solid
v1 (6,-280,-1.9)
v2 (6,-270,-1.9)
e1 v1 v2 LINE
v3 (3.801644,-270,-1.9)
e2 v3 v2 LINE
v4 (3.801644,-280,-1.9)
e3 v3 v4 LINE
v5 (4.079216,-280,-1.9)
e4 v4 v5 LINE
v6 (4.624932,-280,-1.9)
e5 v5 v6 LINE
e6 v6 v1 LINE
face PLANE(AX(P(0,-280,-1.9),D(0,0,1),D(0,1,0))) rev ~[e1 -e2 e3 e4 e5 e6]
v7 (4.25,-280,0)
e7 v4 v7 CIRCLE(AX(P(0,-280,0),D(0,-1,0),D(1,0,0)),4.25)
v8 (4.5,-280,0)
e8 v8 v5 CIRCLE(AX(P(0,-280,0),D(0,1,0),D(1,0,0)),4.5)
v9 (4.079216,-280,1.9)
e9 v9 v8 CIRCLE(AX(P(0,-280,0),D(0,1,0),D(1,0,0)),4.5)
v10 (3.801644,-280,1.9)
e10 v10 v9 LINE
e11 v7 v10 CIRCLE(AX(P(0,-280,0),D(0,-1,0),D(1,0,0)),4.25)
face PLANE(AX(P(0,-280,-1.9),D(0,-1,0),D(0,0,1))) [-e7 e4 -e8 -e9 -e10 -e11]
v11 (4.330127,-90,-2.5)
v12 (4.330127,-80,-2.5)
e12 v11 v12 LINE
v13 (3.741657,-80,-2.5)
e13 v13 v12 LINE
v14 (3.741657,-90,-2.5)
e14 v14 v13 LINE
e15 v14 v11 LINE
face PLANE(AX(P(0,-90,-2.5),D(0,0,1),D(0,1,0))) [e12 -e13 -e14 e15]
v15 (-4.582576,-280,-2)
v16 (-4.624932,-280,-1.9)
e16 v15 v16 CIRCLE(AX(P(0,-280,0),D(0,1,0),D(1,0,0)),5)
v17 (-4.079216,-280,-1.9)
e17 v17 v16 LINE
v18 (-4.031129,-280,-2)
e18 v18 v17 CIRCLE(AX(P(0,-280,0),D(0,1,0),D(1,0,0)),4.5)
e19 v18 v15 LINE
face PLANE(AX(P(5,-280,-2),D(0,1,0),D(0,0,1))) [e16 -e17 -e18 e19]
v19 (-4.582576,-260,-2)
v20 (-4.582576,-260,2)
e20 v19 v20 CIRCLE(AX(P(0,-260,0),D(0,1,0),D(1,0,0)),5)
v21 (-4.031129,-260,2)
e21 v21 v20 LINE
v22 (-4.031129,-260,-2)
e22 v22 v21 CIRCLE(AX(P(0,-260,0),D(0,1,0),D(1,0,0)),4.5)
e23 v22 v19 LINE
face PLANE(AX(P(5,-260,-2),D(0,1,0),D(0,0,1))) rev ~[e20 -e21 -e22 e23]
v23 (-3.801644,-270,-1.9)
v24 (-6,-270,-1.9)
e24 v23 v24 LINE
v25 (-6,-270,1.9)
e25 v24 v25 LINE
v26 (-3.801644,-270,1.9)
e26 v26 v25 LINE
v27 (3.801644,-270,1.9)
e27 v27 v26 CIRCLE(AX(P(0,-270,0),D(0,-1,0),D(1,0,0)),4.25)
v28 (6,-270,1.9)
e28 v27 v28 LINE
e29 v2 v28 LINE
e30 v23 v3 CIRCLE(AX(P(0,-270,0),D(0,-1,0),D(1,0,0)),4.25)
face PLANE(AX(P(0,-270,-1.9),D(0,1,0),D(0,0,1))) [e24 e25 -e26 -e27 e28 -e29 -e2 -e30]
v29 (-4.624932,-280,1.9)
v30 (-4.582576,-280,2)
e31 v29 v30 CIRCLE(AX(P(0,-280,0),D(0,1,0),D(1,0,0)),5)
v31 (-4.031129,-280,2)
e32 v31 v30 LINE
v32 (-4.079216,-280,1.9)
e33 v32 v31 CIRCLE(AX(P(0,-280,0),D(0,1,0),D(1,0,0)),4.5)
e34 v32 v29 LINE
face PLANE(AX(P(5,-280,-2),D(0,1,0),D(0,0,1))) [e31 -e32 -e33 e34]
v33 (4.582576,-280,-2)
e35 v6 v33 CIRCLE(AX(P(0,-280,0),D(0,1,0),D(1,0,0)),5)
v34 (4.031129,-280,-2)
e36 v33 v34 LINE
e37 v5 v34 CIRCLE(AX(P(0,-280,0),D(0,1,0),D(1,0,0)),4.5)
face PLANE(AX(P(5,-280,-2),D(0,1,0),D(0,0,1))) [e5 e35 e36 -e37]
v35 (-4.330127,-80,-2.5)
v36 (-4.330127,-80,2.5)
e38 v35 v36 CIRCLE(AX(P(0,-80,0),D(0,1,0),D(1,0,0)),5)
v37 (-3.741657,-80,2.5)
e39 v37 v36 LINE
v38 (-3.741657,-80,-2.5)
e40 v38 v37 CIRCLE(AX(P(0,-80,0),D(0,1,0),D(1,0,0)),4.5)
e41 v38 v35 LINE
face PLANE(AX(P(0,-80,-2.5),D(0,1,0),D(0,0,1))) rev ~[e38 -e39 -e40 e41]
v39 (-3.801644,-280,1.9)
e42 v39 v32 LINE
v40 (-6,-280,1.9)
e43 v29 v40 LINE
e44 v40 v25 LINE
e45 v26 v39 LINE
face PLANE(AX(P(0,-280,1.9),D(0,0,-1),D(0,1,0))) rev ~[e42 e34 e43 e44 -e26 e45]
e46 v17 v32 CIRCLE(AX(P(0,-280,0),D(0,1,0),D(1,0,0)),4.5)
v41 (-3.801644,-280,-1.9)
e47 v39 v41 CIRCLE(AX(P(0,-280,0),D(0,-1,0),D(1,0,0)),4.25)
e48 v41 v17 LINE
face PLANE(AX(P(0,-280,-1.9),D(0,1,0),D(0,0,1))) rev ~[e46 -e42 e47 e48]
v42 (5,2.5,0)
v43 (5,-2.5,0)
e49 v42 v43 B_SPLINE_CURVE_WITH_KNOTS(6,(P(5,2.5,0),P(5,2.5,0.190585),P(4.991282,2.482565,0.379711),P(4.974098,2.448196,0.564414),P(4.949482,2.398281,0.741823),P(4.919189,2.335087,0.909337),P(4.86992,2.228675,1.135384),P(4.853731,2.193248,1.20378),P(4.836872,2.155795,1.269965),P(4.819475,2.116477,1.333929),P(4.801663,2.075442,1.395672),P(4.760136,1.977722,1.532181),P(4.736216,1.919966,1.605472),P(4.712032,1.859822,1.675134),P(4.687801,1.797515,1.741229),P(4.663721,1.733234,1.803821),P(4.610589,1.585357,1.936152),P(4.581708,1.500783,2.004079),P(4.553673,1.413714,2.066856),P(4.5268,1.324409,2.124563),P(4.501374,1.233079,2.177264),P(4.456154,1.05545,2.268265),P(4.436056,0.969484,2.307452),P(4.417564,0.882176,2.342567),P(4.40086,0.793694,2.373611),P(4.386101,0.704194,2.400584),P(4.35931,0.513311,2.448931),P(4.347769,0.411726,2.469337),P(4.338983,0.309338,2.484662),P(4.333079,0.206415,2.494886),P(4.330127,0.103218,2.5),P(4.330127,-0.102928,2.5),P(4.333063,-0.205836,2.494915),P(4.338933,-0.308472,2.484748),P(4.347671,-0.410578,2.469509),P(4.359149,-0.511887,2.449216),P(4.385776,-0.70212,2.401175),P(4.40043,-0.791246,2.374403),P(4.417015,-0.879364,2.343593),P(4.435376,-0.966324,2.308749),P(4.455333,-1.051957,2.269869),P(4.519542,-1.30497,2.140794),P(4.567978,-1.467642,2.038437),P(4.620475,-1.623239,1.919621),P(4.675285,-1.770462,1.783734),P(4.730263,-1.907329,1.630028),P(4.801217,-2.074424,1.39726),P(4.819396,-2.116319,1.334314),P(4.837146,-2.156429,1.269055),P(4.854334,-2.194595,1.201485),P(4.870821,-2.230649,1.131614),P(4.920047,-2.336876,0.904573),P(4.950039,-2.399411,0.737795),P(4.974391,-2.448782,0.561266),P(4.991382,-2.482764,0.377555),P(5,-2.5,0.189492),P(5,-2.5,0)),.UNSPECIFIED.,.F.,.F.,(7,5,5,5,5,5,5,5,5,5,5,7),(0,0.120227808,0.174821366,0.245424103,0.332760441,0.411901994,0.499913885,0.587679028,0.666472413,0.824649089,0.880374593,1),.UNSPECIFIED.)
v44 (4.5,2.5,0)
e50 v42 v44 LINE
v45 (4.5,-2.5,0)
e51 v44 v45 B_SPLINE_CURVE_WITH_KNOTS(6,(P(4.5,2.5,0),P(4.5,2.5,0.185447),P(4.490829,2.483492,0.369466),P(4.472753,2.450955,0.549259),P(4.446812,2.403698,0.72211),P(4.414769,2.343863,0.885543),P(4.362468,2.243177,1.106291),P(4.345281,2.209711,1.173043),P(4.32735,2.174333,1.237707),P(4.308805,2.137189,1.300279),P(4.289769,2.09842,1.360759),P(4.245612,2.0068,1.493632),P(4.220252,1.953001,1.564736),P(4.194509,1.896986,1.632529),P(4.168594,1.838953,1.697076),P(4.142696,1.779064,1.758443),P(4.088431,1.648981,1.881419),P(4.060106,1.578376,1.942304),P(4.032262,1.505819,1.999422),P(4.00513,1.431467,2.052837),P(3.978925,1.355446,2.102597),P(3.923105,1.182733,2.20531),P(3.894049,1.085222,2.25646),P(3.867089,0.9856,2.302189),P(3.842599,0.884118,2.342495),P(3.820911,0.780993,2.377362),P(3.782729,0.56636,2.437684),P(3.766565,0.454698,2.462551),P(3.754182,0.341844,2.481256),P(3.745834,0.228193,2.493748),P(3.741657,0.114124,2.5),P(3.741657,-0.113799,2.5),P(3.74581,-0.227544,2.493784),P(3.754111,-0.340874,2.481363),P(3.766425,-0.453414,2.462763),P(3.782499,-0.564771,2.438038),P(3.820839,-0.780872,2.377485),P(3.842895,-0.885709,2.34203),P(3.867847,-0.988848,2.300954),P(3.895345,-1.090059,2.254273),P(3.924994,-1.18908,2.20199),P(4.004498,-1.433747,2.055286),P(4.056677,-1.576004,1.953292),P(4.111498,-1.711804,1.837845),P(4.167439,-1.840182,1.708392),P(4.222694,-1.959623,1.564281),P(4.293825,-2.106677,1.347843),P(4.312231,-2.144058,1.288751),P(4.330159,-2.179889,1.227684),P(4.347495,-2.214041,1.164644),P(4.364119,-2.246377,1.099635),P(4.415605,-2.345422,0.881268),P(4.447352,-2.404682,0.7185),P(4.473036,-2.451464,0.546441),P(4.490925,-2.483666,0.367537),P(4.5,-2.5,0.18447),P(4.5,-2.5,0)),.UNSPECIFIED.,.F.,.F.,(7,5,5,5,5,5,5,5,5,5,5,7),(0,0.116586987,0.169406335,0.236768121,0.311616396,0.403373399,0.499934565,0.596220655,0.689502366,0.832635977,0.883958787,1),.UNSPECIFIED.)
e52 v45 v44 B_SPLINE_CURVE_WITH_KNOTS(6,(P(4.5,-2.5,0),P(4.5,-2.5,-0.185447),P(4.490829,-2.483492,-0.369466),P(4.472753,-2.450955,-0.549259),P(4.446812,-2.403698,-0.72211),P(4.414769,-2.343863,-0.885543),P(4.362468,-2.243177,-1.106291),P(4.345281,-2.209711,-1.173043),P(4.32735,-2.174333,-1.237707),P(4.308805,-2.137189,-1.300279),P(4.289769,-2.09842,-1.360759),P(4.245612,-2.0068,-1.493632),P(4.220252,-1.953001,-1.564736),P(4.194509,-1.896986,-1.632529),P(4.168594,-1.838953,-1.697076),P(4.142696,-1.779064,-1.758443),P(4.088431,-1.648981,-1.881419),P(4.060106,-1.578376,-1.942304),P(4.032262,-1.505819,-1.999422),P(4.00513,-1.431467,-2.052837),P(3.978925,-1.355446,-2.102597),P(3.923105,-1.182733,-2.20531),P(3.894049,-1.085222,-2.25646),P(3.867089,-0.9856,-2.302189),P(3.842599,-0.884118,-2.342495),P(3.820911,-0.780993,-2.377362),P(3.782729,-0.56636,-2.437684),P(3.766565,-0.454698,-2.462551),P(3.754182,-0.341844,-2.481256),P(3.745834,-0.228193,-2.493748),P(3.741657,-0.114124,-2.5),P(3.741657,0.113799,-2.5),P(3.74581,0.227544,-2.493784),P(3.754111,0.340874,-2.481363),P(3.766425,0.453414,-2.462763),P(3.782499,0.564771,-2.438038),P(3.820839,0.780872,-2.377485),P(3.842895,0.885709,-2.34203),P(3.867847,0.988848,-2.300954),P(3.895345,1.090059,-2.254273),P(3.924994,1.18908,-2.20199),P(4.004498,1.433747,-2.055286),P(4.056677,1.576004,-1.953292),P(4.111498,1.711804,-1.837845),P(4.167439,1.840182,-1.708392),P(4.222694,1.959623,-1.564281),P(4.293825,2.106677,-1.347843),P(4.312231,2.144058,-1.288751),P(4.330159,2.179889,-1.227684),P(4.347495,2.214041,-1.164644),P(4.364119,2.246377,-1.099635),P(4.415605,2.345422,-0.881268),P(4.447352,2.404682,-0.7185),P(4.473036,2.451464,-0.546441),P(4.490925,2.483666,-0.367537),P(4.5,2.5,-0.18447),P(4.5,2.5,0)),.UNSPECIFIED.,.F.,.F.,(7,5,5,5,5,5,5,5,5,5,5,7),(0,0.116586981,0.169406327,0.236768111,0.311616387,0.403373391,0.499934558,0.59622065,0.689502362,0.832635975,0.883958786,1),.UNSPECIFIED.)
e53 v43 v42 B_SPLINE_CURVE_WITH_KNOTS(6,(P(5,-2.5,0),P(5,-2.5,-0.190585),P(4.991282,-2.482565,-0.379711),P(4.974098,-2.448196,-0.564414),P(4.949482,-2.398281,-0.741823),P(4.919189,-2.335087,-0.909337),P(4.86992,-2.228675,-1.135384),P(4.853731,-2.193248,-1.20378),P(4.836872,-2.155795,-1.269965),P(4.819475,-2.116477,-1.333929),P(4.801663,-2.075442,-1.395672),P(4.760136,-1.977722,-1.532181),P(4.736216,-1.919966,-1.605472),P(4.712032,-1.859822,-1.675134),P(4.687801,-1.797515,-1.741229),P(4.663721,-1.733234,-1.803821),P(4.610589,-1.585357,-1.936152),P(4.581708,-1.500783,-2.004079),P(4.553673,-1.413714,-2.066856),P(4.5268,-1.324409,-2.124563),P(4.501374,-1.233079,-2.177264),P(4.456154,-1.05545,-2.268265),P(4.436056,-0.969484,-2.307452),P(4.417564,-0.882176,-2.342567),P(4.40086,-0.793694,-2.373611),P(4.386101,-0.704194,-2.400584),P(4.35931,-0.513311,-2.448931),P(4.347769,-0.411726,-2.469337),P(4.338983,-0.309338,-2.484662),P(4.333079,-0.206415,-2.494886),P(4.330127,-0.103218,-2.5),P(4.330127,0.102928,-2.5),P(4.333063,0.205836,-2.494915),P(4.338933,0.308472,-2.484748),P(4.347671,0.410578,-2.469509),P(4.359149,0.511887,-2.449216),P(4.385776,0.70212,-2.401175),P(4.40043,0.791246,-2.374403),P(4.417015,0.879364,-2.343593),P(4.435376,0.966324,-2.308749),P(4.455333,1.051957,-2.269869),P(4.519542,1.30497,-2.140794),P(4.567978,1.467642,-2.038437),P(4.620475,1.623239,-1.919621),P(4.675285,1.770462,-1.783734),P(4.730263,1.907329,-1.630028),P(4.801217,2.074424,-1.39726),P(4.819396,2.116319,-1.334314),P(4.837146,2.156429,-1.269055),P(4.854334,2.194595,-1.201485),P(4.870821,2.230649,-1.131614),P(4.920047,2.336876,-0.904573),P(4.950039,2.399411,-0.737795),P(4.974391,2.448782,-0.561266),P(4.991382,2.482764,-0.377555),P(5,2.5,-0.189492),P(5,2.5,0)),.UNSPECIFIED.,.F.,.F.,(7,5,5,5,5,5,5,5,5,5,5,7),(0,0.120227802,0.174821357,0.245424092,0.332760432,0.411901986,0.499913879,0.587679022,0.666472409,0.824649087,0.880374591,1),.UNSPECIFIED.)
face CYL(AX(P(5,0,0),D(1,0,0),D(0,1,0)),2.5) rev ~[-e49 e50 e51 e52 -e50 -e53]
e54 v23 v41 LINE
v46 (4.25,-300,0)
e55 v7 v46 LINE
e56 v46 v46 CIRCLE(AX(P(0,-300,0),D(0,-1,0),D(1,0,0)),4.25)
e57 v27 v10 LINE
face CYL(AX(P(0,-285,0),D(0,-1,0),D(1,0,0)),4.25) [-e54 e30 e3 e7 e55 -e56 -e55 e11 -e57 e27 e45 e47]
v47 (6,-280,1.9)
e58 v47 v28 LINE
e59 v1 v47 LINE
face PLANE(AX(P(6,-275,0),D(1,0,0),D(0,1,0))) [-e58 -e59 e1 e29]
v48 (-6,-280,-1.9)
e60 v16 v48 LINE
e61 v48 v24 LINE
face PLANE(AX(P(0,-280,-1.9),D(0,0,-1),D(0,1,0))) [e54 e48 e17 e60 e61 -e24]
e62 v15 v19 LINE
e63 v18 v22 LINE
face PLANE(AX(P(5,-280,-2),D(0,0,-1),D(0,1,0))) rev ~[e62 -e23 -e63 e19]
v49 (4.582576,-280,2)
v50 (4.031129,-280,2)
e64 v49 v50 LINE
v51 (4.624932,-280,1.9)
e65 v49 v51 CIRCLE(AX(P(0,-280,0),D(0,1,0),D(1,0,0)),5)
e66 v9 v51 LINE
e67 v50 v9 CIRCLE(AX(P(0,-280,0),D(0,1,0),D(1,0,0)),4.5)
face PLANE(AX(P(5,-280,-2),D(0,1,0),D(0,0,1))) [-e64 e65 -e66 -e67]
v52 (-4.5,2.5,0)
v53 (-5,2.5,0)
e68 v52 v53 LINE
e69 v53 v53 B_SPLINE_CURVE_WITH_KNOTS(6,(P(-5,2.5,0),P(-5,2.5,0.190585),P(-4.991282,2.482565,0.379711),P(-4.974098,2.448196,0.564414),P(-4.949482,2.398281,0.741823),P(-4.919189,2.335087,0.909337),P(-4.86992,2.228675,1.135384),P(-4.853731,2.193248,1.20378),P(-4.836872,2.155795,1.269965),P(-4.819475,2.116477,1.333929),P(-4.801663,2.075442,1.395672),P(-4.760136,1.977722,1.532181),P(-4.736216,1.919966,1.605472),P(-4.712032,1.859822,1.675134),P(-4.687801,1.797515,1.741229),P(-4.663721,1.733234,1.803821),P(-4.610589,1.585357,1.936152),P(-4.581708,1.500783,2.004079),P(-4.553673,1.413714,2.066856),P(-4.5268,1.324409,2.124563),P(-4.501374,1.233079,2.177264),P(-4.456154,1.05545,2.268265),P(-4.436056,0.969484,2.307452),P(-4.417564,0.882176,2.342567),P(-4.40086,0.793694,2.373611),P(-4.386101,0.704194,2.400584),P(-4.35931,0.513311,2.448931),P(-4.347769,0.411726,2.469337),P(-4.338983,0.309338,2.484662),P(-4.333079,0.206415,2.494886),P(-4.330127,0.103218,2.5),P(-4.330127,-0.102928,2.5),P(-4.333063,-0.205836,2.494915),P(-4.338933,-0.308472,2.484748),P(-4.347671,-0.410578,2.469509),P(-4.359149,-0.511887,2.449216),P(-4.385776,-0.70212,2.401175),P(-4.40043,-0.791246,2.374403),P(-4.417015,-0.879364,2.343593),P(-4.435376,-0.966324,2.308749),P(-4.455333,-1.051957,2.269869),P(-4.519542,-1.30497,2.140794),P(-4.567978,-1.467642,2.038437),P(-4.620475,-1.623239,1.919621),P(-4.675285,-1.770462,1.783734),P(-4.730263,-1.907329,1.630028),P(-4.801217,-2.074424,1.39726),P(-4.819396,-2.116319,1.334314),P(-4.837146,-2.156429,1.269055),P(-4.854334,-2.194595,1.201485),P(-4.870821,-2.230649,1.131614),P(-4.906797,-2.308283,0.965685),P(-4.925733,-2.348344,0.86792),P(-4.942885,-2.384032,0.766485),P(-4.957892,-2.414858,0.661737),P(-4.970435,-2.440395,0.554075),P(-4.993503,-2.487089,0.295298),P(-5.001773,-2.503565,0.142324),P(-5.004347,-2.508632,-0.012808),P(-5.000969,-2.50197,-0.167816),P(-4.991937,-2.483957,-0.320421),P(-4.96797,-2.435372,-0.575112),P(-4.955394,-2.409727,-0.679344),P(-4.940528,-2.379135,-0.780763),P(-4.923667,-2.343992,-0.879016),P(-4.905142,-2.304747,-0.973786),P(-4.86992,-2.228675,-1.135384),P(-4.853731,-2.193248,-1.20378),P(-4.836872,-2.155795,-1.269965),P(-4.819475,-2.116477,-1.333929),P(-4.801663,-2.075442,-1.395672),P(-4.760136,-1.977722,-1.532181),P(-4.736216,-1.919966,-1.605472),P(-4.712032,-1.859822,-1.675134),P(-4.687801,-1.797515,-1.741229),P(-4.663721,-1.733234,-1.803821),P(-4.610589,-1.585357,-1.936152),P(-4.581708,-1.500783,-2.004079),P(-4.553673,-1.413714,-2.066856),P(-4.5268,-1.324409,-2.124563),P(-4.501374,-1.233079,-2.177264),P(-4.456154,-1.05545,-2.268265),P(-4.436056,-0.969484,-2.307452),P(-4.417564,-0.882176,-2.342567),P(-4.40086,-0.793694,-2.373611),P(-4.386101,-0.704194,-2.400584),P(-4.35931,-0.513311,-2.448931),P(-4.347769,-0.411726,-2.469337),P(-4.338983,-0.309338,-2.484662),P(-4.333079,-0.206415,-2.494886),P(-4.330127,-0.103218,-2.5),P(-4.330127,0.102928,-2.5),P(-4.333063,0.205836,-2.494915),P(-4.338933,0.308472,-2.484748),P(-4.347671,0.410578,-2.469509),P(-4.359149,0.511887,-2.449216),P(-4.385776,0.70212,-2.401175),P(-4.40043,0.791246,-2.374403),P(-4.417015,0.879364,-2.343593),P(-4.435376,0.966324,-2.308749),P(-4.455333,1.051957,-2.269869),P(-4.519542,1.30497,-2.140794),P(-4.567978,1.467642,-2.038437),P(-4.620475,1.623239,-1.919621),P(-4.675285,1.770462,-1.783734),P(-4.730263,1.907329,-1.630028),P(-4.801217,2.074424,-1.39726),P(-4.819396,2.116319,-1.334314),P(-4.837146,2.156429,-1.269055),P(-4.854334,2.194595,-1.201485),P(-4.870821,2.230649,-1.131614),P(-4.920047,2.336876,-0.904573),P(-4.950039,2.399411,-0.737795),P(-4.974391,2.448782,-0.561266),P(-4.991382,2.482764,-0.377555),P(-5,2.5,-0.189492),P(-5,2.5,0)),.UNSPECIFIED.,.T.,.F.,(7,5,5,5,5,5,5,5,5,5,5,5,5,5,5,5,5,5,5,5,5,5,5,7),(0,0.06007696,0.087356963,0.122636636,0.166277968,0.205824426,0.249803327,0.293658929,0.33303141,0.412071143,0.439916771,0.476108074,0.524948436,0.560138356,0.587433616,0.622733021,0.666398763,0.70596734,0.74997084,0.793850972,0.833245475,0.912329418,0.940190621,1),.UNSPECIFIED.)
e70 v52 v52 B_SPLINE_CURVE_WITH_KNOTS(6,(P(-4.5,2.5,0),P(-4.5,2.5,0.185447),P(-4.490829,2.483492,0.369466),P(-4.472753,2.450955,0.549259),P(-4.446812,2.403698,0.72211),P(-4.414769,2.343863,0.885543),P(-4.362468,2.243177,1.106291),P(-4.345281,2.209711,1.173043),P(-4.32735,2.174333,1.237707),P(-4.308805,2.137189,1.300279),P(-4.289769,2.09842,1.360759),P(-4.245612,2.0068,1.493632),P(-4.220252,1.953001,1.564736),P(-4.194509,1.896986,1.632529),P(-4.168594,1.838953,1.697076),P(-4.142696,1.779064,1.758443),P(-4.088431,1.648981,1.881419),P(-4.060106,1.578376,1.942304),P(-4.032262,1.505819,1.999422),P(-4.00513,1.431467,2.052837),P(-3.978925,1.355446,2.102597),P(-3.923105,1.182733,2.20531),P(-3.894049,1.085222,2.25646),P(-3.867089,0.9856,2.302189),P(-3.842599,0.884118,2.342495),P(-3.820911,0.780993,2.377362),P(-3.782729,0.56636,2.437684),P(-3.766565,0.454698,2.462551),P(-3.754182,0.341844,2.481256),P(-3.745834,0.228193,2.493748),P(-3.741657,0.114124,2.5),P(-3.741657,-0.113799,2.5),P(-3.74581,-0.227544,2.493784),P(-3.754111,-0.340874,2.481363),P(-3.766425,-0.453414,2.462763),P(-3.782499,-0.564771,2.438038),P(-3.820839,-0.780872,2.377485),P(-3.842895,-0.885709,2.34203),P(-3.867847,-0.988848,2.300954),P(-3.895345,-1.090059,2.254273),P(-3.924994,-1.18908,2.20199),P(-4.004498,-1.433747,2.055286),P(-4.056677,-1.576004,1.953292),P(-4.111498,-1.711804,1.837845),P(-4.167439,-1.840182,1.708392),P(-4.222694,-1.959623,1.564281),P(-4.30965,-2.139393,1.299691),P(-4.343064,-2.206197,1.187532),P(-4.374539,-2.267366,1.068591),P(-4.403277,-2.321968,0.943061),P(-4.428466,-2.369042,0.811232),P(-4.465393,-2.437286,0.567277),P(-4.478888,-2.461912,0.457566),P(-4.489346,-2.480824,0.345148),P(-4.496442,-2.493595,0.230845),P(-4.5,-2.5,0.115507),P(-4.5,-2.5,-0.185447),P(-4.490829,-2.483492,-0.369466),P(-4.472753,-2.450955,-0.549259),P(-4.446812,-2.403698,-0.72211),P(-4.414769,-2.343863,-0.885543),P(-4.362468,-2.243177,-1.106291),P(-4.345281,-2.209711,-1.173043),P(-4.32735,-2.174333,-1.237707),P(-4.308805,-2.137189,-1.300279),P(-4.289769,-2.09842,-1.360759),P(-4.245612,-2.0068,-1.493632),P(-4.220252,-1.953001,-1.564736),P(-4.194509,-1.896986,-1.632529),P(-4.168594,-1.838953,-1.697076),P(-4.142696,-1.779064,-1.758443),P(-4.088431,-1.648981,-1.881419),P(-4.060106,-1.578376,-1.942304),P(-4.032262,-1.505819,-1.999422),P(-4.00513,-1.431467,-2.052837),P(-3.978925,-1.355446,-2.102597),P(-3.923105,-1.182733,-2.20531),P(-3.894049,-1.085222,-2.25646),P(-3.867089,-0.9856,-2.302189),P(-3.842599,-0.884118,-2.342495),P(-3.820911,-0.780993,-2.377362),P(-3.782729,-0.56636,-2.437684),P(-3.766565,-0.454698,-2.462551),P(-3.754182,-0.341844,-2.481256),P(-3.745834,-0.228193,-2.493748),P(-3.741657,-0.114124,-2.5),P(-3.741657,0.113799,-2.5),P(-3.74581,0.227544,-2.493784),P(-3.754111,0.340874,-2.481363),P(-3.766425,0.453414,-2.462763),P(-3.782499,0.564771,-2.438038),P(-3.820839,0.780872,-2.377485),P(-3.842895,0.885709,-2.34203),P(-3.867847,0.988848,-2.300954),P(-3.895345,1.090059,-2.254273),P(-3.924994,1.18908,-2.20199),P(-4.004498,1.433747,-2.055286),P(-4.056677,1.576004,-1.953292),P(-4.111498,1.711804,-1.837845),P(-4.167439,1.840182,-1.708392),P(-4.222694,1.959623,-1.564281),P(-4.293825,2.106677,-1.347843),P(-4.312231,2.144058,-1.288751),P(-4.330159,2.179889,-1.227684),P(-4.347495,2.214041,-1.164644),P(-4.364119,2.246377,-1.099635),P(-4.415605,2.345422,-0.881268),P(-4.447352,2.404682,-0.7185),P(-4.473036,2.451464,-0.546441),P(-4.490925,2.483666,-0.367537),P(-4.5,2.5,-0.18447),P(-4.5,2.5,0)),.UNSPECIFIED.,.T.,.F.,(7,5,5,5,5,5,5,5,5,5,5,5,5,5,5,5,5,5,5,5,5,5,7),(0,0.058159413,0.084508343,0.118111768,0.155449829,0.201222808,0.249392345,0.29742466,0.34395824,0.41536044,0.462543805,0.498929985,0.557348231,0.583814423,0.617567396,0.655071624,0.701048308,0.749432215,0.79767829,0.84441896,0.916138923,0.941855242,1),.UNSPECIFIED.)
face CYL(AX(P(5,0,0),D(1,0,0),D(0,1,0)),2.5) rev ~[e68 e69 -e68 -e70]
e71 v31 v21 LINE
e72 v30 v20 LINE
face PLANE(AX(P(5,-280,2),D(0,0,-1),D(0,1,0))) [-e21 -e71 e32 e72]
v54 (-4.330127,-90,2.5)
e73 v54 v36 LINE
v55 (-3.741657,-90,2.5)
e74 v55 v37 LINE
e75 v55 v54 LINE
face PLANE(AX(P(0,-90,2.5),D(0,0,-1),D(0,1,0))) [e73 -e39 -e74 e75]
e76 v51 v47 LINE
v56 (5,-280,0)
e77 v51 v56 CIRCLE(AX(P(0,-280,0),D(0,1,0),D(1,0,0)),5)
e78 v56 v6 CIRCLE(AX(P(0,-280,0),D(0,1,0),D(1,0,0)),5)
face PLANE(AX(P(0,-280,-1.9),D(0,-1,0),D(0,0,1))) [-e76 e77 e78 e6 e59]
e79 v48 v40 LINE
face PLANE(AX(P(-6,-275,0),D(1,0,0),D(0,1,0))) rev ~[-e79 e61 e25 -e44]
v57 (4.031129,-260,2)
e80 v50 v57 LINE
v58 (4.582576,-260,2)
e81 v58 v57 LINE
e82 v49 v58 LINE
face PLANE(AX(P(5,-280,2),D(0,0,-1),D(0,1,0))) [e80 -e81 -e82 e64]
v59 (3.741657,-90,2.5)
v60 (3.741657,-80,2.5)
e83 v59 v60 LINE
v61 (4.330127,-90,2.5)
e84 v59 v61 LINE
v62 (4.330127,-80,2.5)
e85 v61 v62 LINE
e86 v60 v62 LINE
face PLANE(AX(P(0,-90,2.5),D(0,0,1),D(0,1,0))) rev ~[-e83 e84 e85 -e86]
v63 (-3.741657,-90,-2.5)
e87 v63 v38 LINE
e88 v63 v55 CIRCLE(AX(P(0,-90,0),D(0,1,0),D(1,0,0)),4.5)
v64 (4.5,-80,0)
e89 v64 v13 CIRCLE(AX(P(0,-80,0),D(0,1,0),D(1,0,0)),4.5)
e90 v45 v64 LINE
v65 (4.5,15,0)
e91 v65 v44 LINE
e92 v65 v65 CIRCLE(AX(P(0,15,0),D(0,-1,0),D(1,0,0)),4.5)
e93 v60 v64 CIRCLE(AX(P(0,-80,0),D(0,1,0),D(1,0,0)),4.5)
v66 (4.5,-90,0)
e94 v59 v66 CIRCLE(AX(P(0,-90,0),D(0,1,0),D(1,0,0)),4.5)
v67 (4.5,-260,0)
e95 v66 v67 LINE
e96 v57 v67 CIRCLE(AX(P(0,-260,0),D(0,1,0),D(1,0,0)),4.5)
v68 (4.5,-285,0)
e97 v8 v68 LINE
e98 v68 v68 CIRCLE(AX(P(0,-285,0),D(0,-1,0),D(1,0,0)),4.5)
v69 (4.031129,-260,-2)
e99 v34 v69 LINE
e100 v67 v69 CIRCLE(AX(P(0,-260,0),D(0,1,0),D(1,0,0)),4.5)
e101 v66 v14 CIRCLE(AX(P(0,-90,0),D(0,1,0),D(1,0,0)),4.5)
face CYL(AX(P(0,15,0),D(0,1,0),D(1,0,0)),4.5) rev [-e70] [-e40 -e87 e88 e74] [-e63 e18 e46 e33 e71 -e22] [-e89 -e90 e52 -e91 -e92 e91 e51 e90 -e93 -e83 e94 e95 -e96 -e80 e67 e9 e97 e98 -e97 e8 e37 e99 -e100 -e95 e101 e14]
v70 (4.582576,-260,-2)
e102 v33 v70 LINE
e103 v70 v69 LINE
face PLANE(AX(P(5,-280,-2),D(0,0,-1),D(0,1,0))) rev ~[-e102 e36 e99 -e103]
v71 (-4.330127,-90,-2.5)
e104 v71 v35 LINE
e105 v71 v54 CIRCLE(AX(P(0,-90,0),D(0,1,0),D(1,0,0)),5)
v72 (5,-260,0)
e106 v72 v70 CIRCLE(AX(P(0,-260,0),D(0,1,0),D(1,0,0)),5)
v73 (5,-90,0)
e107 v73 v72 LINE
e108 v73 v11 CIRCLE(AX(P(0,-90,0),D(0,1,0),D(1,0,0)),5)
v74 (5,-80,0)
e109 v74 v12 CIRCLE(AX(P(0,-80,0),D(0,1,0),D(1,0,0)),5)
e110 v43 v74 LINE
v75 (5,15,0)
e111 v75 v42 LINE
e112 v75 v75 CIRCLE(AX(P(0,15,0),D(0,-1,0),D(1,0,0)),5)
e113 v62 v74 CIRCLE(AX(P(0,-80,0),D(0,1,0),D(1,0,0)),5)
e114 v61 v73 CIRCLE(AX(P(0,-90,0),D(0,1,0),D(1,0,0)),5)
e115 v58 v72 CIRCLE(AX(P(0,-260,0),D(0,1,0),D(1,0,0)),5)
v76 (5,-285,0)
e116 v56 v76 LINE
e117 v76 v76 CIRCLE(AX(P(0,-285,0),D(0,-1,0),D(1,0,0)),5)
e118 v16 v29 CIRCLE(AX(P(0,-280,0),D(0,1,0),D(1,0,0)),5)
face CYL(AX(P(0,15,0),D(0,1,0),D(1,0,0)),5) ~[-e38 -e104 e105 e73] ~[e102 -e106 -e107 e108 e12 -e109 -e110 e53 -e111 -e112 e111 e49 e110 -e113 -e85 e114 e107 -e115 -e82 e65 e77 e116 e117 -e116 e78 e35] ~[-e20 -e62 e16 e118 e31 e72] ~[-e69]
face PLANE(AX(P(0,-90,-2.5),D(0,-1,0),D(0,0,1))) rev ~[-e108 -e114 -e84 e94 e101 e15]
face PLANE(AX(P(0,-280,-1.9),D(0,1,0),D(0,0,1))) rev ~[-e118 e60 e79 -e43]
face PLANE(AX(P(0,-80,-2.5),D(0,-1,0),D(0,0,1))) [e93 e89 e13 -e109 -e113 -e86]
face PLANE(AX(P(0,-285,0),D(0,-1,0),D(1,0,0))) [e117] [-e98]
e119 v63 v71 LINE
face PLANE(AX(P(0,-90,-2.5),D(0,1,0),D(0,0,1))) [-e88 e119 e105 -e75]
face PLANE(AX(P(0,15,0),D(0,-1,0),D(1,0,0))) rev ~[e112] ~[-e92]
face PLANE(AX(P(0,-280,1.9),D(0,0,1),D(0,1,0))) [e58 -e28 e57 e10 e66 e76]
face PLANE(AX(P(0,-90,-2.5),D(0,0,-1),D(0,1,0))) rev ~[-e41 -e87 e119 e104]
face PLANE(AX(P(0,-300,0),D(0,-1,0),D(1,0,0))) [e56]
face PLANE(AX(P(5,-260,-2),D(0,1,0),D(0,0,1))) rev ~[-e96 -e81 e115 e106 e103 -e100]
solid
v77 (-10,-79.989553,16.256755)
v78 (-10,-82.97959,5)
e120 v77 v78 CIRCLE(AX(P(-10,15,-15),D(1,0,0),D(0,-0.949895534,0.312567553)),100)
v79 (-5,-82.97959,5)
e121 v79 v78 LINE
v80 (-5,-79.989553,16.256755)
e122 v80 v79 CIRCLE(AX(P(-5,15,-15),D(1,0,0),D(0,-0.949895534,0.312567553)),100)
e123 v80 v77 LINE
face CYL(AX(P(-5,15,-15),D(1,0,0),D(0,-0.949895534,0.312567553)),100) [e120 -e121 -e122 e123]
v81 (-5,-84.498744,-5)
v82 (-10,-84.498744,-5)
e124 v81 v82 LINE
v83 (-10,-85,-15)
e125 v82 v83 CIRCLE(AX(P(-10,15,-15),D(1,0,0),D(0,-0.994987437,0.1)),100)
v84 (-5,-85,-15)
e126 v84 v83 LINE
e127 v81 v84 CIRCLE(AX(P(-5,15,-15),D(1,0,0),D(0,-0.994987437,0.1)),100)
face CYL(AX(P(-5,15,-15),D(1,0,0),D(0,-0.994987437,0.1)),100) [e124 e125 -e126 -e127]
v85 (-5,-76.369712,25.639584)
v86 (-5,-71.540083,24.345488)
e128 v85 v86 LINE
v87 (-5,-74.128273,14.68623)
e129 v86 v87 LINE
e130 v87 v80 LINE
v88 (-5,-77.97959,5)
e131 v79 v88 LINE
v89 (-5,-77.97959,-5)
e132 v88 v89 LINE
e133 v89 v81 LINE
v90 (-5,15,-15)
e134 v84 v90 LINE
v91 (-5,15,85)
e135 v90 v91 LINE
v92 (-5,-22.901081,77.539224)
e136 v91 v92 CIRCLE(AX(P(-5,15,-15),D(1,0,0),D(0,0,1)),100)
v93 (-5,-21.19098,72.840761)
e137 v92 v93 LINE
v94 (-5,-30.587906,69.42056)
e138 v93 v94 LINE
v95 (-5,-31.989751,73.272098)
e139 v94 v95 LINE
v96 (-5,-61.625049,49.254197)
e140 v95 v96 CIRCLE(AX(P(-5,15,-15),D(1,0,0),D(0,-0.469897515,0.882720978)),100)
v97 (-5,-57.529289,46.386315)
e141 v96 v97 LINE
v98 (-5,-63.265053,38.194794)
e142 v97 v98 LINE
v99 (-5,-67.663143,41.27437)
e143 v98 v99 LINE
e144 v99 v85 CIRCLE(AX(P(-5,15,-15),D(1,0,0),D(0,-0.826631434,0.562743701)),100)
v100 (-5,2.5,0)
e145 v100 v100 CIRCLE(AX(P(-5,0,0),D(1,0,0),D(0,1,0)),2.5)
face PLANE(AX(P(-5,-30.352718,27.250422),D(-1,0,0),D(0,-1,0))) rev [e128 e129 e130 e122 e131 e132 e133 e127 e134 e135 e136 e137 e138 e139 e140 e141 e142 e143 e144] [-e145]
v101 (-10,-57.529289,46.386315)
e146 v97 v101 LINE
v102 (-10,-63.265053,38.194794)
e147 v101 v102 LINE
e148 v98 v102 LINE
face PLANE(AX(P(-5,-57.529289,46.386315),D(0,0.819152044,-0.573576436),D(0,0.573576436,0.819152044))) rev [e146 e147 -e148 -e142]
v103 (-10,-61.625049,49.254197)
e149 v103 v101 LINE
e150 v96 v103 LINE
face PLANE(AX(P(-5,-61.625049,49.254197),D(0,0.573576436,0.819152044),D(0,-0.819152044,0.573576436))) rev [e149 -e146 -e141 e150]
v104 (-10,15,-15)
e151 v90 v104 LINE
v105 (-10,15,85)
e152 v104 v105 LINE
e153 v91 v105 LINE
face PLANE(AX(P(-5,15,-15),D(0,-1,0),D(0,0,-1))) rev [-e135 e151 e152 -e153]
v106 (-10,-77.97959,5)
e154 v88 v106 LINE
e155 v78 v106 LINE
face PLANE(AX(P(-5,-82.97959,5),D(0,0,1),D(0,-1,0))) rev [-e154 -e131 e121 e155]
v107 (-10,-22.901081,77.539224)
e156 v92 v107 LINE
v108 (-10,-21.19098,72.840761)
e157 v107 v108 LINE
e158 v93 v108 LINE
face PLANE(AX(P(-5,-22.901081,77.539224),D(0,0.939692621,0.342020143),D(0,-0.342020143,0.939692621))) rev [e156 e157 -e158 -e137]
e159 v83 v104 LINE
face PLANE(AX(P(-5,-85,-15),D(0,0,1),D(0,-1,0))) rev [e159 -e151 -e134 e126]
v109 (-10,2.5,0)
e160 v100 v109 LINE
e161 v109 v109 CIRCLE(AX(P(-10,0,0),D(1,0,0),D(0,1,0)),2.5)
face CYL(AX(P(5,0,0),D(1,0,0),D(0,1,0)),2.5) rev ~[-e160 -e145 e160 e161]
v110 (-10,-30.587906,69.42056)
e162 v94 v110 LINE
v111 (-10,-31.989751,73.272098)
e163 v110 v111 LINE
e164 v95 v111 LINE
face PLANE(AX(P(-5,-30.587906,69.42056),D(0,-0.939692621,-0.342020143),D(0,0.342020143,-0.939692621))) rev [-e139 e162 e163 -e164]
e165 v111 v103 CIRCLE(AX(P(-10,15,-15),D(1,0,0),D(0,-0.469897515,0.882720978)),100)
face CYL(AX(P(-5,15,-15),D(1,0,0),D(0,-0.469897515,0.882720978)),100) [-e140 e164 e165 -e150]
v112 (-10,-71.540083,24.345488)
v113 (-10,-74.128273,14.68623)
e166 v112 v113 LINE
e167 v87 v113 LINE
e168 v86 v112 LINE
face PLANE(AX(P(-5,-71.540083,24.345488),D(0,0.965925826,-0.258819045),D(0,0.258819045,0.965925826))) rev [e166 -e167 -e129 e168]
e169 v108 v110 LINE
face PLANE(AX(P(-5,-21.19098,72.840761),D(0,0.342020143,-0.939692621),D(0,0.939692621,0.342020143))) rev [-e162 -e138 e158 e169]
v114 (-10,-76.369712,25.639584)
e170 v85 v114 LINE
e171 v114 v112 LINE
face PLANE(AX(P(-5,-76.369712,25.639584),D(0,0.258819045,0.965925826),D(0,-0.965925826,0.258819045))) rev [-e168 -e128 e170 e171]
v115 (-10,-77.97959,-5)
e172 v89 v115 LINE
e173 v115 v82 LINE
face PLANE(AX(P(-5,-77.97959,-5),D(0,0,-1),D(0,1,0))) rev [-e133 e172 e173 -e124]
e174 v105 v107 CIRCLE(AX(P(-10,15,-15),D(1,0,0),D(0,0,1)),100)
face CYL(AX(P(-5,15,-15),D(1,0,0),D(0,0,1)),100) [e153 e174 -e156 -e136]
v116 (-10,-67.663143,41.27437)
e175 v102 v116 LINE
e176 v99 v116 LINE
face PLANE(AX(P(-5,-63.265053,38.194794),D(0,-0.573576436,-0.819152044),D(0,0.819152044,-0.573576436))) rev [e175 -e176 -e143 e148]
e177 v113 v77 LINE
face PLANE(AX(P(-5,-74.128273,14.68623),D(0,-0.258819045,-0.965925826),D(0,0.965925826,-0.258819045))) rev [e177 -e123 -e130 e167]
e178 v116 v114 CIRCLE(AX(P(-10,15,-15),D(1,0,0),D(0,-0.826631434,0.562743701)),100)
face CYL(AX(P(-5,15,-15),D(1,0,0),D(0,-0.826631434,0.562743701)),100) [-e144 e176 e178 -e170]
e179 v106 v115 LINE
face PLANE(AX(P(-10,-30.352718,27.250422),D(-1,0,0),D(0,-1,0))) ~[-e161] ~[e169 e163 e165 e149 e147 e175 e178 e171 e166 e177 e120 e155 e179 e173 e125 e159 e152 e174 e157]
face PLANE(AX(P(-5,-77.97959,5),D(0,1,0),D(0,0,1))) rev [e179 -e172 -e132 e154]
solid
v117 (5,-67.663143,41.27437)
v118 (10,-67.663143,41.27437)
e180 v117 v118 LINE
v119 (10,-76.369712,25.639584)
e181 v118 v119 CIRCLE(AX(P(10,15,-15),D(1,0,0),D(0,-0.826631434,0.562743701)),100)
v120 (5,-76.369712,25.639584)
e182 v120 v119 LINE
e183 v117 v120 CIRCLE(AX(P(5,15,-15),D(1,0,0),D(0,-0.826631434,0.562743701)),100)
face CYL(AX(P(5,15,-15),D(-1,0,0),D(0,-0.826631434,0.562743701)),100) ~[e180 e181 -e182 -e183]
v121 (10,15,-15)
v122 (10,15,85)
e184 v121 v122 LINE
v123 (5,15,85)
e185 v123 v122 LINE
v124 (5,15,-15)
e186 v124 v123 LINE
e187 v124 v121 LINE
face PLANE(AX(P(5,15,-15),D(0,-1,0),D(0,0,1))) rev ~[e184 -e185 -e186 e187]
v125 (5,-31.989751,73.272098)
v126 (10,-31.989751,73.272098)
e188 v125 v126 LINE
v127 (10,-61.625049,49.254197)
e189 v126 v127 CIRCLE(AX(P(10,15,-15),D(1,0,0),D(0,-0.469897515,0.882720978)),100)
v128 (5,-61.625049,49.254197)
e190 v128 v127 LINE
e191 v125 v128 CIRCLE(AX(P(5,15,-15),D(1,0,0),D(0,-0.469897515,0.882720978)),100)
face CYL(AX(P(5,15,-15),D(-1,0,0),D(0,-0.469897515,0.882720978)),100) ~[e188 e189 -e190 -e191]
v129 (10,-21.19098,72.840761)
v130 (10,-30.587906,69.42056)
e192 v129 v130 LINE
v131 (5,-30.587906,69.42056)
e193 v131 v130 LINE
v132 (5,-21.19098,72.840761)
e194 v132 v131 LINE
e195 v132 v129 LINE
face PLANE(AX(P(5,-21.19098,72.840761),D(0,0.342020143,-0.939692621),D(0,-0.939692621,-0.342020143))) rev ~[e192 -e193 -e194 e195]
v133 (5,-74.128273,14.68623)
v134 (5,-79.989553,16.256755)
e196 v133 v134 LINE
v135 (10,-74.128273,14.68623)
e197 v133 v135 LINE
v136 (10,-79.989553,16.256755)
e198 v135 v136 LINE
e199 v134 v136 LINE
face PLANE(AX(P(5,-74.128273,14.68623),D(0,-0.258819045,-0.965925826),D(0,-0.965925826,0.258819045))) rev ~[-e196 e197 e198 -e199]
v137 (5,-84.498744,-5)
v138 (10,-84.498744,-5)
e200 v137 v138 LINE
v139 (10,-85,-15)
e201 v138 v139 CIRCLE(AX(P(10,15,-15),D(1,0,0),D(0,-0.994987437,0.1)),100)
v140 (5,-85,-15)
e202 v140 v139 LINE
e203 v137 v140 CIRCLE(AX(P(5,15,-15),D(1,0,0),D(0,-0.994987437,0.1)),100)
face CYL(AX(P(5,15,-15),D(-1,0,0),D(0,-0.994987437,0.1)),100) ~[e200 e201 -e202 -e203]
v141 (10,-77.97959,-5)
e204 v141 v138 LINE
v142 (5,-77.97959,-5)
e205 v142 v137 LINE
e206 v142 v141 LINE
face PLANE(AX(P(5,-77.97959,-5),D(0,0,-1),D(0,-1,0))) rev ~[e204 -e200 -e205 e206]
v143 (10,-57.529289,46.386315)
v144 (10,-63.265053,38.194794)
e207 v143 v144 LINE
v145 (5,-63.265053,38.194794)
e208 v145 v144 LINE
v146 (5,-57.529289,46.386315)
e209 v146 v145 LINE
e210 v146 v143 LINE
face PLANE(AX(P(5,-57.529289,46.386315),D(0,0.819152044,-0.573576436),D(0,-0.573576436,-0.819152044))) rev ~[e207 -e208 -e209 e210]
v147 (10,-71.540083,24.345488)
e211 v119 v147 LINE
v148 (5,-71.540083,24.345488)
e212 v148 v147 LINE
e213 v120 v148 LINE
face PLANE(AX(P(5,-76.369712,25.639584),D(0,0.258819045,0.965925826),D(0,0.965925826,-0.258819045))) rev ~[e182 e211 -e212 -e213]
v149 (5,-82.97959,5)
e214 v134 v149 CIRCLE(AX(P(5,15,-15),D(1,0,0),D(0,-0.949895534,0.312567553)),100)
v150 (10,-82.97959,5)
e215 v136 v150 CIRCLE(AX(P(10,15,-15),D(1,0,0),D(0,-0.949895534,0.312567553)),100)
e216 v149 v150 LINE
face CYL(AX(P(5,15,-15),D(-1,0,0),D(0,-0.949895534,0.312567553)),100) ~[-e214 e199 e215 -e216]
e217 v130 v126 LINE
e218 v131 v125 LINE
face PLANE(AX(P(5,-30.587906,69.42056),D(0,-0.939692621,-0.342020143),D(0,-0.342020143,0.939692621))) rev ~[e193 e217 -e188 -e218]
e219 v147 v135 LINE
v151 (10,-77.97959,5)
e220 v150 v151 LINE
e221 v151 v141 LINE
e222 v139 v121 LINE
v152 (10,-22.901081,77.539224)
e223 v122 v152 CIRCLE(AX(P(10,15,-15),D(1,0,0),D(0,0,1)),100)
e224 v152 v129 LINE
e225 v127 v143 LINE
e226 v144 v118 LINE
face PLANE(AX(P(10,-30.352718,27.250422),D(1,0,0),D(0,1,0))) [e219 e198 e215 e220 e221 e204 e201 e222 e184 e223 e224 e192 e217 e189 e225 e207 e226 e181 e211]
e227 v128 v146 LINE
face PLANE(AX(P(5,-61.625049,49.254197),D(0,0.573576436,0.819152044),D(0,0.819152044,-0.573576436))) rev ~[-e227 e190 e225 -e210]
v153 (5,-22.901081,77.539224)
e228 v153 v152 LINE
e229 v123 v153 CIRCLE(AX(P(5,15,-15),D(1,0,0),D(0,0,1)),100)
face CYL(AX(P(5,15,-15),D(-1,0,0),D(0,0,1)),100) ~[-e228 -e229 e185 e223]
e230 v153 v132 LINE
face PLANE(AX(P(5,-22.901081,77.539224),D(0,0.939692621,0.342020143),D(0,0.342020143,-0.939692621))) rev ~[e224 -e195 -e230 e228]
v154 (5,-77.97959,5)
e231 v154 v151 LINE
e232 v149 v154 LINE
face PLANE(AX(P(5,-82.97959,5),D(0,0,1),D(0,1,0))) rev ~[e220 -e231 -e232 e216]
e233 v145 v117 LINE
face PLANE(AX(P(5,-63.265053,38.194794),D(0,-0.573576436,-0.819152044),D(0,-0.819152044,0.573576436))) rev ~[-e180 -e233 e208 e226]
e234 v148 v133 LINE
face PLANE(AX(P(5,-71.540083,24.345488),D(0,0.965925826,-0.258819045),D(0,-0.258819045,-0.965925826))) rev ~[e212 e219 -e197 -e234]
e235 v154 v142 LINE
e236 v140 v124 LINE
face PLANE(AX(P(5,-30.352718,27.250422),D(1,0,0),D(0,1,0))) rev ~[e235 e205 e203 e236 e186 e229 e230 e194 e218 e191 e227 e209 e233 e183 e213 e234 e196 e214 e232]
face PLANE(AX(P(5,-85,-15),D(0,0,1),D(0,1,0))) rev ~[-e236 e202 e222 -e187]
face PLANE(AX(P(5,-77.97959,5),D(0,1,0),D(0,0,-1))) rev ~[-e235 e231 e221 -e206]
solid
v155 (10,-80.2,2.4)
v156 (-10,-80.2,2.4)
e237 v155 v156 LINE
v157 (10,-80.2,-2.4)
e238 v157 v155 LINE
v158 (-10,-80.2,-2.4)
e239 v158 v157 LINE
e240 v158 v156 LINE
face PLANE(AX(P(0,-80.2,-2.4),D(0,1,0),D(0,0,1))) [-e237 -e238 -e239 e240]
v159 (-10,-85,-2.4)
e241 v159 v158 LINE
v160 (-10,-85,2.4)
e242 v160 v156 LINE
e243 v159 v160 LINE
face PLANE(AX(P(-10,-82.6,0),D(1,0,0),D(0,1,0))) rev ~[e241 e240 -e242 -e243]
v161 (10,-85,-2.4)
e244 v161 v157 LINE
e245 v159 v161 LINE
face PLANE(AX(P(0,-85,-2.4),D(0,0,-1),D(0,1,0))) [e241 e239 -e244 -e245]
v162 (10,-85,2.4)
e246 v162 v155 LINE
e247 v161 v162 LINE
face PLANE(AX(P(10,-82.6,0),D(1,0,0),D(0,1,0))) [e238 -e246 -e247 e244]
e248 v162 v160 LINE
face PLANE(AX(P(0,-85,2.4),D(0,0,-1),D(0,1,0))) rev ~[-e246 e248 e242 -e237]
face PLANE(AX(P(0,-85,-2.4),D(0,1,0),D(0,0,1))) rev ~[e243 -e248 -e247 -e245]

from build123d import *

# Parameters (mm, degrees)
F2_DEPTH       = 5
F5_R           = 5
F5_R_2         = 4.5
F6_DEPTH       = 300
F7_W           = 20
F7_H           = 4
F8_DEPTH       = 25
F9_R           = 4.25
F10_DEPTH      = 15
F10_DEPTH_BACK = 15
F11_W          = 10
F11_H          = 3.8
F12_DEPTH      = 6
F12_DEPTH_BACK = 6
F13_W          = 10
F13_H          = 5
F14_DEPTH      = 25
F14_DEPTH_BACK = 25
F15_W          = 4.8
F15_H          = 4.8
F16_DEPTH      = 10
F16_DEPTH_BACK = 10
F17_D          = 5
F17_DEPTH      = 15.001
F17_2_D        = 5
F17_2_DEPTH    = 15.001


with BuildPart() as f2:
    # F1 (on offset) → F2 (new body)
    with BuildSketch(Plane.YZ.offset(5)):
        with BuildLine():
            ThreePointArc((-84.4987437107, -5), (-84.874607311, -9.993722494), (-85, -15))
            Line((-85, -15), (15, -15))
            Line((15, -15), (15, 85))
            ThreePointArc((15, 85), (-4.3142117375, 83.1170791705), (-22.9010808434, 77.5392244991))
            Line((-22.9010808434, 77.5392244991), (-21.1909801268, 72.8407613952))
            Line((-21.1909801268, 72.8407613952), (-30.5879063346, 69.420559962))
            Line((-30.5879063346, 69.420559962), (-31.9897514765, 73.2720978349))
            ThreePointArc((-31.9897514765, 73.2720978349), (-47.9632403067, 62.6893195367), (-61.625049246, 49.2541969684))
            Line((-61.625049246, 49.2541969684), (-57.5292890245, 46.3863147866))
            Line((-57.5292890245, 46.3863147866), (-63.265053388, 38.1947943437))
            Line((-63.265053388, 38.1947943437), (-67.6631433607, 41.2743700963))
            ThreePointArc((-67.6631433607, 41.2743700963), (-72.3668719499, 33.6521293028), (-76.3697118886, 25.6395835288))
            Line((-76.3697118886, 25.6395835288), (-71.5400827572, 24.3454883033))
            Line((-71.5400827572, 24.3454883033), (-74.1282732082, 14.6862300404))
            Line((-74.1282732082, 14.6862300404), (-79.9895533557, 16.2567553225))
            ThreePointArc((-79.9895533557, 16.2567553225), (-81.6485963638, 10.6719461845), (-82.9795897113, 5))
            Line((-82.9795897113, 5), (-77.9795897113, 5))
            Line((-77.9795897113, 5), (-77.9795897113, -5))
            Line((-77.9795897113, -5), (-84.4987437107, -5))
        make_face()
    extrude(amount=F2_DEPTH)


with BuildPart() as f3_1:
    # F3: instance of F2
    add(f2.part.mirror(Plane.YZ))

    # F17 (through all, one way)
    with BuildSketch(Plane.YZ.offset(5)):
        with Locations((0, 0)):
            Circle(F17_D / 2)
    extrude(amount=-F17_DEPTH, mode=Mode.SUBTRACT)


with BuildPart() as f6:
    # F5 (on offset) → F6 (new body)
    with BuildSketch(Plane.XZ.offset(-15)):
        Circle(F5_R)
        Circle(F5_R_2, mode=Mode.SUBTRACT)
    extrude(amount=F6_DEPTH)

    # F7 (on offset) → F8 (cut)
    with BuildSketch(Plane.YZ.offset(5)):
        with Locations((-270, 0)):
            Rectangle(F7_W, F7_H)
    extrude(amount=-F8_DEPTH, mode=Mode.SUBTRACT)



with BuildPart() as f10:
    # F9 (on face) → F10 (new body, two sides)
    with BuildSketch(Plane.XZ.offset(285)) as f10_sk:
        Circle(F9_R)
    extrude(amount=F10_DEPTH)
    extrude(f10_sk.sketch, amount=-F10_DEPTH_BACK)


with BuildPart() as f6_1:
    add(f6.part)

    add(f10.part)  # F12 merges F10
    # F11 (on Right) → F12 (join, two sides)
    with BuildSketch(Plane.YZ) as f12_sk:
        with Locations((-275, 0)):
            Rectangle(F11_W, F11_H)
    extrude(amount=F12_DEPTH)
    extrude(f12_sk.sketch, amount=-F12_DEPTH_BACK)

    # F13 (on Right) → F14 (cut, two sides)
    with BuildSketch(Plane.YZ) as f14_sk:
        with Locations((-85, 0)):
            Rectangle(F13_W, F13_H)
    extrude(amount=F14_DEPTH, mode=Mode.SUBTRACT)
    extrude(f14_sk.sketch, amount=-F14_DEPTH_BACK, mode=Mode.SUBTRACT)

    # F17#2 (through all, one way)
    with BuildSketch(Plane.YZ.offset(5)):
        with Locations((0, 0)):
            Circle(F17_2_D / 2)
    extrude(amount=-F17_2_DEPTH, mode=Mode.SUBTRACT)


with BuildPart() as f16:
    # F15 (on Right) → F16 (new body, two sides)
    with BuildSketch(Plane.YZ) as f16_sk:
        with Locations((-82.6, 0)):
            Rectangle(F15_W, F15_H)
    extrude(amount=F16_DEPTH)
    extrude(f16_sk.sketch, amount=-F16_DEPTH_BACK)


solid = Compound([f2.part, f3_1.part, f6_1.part, f16.part])
